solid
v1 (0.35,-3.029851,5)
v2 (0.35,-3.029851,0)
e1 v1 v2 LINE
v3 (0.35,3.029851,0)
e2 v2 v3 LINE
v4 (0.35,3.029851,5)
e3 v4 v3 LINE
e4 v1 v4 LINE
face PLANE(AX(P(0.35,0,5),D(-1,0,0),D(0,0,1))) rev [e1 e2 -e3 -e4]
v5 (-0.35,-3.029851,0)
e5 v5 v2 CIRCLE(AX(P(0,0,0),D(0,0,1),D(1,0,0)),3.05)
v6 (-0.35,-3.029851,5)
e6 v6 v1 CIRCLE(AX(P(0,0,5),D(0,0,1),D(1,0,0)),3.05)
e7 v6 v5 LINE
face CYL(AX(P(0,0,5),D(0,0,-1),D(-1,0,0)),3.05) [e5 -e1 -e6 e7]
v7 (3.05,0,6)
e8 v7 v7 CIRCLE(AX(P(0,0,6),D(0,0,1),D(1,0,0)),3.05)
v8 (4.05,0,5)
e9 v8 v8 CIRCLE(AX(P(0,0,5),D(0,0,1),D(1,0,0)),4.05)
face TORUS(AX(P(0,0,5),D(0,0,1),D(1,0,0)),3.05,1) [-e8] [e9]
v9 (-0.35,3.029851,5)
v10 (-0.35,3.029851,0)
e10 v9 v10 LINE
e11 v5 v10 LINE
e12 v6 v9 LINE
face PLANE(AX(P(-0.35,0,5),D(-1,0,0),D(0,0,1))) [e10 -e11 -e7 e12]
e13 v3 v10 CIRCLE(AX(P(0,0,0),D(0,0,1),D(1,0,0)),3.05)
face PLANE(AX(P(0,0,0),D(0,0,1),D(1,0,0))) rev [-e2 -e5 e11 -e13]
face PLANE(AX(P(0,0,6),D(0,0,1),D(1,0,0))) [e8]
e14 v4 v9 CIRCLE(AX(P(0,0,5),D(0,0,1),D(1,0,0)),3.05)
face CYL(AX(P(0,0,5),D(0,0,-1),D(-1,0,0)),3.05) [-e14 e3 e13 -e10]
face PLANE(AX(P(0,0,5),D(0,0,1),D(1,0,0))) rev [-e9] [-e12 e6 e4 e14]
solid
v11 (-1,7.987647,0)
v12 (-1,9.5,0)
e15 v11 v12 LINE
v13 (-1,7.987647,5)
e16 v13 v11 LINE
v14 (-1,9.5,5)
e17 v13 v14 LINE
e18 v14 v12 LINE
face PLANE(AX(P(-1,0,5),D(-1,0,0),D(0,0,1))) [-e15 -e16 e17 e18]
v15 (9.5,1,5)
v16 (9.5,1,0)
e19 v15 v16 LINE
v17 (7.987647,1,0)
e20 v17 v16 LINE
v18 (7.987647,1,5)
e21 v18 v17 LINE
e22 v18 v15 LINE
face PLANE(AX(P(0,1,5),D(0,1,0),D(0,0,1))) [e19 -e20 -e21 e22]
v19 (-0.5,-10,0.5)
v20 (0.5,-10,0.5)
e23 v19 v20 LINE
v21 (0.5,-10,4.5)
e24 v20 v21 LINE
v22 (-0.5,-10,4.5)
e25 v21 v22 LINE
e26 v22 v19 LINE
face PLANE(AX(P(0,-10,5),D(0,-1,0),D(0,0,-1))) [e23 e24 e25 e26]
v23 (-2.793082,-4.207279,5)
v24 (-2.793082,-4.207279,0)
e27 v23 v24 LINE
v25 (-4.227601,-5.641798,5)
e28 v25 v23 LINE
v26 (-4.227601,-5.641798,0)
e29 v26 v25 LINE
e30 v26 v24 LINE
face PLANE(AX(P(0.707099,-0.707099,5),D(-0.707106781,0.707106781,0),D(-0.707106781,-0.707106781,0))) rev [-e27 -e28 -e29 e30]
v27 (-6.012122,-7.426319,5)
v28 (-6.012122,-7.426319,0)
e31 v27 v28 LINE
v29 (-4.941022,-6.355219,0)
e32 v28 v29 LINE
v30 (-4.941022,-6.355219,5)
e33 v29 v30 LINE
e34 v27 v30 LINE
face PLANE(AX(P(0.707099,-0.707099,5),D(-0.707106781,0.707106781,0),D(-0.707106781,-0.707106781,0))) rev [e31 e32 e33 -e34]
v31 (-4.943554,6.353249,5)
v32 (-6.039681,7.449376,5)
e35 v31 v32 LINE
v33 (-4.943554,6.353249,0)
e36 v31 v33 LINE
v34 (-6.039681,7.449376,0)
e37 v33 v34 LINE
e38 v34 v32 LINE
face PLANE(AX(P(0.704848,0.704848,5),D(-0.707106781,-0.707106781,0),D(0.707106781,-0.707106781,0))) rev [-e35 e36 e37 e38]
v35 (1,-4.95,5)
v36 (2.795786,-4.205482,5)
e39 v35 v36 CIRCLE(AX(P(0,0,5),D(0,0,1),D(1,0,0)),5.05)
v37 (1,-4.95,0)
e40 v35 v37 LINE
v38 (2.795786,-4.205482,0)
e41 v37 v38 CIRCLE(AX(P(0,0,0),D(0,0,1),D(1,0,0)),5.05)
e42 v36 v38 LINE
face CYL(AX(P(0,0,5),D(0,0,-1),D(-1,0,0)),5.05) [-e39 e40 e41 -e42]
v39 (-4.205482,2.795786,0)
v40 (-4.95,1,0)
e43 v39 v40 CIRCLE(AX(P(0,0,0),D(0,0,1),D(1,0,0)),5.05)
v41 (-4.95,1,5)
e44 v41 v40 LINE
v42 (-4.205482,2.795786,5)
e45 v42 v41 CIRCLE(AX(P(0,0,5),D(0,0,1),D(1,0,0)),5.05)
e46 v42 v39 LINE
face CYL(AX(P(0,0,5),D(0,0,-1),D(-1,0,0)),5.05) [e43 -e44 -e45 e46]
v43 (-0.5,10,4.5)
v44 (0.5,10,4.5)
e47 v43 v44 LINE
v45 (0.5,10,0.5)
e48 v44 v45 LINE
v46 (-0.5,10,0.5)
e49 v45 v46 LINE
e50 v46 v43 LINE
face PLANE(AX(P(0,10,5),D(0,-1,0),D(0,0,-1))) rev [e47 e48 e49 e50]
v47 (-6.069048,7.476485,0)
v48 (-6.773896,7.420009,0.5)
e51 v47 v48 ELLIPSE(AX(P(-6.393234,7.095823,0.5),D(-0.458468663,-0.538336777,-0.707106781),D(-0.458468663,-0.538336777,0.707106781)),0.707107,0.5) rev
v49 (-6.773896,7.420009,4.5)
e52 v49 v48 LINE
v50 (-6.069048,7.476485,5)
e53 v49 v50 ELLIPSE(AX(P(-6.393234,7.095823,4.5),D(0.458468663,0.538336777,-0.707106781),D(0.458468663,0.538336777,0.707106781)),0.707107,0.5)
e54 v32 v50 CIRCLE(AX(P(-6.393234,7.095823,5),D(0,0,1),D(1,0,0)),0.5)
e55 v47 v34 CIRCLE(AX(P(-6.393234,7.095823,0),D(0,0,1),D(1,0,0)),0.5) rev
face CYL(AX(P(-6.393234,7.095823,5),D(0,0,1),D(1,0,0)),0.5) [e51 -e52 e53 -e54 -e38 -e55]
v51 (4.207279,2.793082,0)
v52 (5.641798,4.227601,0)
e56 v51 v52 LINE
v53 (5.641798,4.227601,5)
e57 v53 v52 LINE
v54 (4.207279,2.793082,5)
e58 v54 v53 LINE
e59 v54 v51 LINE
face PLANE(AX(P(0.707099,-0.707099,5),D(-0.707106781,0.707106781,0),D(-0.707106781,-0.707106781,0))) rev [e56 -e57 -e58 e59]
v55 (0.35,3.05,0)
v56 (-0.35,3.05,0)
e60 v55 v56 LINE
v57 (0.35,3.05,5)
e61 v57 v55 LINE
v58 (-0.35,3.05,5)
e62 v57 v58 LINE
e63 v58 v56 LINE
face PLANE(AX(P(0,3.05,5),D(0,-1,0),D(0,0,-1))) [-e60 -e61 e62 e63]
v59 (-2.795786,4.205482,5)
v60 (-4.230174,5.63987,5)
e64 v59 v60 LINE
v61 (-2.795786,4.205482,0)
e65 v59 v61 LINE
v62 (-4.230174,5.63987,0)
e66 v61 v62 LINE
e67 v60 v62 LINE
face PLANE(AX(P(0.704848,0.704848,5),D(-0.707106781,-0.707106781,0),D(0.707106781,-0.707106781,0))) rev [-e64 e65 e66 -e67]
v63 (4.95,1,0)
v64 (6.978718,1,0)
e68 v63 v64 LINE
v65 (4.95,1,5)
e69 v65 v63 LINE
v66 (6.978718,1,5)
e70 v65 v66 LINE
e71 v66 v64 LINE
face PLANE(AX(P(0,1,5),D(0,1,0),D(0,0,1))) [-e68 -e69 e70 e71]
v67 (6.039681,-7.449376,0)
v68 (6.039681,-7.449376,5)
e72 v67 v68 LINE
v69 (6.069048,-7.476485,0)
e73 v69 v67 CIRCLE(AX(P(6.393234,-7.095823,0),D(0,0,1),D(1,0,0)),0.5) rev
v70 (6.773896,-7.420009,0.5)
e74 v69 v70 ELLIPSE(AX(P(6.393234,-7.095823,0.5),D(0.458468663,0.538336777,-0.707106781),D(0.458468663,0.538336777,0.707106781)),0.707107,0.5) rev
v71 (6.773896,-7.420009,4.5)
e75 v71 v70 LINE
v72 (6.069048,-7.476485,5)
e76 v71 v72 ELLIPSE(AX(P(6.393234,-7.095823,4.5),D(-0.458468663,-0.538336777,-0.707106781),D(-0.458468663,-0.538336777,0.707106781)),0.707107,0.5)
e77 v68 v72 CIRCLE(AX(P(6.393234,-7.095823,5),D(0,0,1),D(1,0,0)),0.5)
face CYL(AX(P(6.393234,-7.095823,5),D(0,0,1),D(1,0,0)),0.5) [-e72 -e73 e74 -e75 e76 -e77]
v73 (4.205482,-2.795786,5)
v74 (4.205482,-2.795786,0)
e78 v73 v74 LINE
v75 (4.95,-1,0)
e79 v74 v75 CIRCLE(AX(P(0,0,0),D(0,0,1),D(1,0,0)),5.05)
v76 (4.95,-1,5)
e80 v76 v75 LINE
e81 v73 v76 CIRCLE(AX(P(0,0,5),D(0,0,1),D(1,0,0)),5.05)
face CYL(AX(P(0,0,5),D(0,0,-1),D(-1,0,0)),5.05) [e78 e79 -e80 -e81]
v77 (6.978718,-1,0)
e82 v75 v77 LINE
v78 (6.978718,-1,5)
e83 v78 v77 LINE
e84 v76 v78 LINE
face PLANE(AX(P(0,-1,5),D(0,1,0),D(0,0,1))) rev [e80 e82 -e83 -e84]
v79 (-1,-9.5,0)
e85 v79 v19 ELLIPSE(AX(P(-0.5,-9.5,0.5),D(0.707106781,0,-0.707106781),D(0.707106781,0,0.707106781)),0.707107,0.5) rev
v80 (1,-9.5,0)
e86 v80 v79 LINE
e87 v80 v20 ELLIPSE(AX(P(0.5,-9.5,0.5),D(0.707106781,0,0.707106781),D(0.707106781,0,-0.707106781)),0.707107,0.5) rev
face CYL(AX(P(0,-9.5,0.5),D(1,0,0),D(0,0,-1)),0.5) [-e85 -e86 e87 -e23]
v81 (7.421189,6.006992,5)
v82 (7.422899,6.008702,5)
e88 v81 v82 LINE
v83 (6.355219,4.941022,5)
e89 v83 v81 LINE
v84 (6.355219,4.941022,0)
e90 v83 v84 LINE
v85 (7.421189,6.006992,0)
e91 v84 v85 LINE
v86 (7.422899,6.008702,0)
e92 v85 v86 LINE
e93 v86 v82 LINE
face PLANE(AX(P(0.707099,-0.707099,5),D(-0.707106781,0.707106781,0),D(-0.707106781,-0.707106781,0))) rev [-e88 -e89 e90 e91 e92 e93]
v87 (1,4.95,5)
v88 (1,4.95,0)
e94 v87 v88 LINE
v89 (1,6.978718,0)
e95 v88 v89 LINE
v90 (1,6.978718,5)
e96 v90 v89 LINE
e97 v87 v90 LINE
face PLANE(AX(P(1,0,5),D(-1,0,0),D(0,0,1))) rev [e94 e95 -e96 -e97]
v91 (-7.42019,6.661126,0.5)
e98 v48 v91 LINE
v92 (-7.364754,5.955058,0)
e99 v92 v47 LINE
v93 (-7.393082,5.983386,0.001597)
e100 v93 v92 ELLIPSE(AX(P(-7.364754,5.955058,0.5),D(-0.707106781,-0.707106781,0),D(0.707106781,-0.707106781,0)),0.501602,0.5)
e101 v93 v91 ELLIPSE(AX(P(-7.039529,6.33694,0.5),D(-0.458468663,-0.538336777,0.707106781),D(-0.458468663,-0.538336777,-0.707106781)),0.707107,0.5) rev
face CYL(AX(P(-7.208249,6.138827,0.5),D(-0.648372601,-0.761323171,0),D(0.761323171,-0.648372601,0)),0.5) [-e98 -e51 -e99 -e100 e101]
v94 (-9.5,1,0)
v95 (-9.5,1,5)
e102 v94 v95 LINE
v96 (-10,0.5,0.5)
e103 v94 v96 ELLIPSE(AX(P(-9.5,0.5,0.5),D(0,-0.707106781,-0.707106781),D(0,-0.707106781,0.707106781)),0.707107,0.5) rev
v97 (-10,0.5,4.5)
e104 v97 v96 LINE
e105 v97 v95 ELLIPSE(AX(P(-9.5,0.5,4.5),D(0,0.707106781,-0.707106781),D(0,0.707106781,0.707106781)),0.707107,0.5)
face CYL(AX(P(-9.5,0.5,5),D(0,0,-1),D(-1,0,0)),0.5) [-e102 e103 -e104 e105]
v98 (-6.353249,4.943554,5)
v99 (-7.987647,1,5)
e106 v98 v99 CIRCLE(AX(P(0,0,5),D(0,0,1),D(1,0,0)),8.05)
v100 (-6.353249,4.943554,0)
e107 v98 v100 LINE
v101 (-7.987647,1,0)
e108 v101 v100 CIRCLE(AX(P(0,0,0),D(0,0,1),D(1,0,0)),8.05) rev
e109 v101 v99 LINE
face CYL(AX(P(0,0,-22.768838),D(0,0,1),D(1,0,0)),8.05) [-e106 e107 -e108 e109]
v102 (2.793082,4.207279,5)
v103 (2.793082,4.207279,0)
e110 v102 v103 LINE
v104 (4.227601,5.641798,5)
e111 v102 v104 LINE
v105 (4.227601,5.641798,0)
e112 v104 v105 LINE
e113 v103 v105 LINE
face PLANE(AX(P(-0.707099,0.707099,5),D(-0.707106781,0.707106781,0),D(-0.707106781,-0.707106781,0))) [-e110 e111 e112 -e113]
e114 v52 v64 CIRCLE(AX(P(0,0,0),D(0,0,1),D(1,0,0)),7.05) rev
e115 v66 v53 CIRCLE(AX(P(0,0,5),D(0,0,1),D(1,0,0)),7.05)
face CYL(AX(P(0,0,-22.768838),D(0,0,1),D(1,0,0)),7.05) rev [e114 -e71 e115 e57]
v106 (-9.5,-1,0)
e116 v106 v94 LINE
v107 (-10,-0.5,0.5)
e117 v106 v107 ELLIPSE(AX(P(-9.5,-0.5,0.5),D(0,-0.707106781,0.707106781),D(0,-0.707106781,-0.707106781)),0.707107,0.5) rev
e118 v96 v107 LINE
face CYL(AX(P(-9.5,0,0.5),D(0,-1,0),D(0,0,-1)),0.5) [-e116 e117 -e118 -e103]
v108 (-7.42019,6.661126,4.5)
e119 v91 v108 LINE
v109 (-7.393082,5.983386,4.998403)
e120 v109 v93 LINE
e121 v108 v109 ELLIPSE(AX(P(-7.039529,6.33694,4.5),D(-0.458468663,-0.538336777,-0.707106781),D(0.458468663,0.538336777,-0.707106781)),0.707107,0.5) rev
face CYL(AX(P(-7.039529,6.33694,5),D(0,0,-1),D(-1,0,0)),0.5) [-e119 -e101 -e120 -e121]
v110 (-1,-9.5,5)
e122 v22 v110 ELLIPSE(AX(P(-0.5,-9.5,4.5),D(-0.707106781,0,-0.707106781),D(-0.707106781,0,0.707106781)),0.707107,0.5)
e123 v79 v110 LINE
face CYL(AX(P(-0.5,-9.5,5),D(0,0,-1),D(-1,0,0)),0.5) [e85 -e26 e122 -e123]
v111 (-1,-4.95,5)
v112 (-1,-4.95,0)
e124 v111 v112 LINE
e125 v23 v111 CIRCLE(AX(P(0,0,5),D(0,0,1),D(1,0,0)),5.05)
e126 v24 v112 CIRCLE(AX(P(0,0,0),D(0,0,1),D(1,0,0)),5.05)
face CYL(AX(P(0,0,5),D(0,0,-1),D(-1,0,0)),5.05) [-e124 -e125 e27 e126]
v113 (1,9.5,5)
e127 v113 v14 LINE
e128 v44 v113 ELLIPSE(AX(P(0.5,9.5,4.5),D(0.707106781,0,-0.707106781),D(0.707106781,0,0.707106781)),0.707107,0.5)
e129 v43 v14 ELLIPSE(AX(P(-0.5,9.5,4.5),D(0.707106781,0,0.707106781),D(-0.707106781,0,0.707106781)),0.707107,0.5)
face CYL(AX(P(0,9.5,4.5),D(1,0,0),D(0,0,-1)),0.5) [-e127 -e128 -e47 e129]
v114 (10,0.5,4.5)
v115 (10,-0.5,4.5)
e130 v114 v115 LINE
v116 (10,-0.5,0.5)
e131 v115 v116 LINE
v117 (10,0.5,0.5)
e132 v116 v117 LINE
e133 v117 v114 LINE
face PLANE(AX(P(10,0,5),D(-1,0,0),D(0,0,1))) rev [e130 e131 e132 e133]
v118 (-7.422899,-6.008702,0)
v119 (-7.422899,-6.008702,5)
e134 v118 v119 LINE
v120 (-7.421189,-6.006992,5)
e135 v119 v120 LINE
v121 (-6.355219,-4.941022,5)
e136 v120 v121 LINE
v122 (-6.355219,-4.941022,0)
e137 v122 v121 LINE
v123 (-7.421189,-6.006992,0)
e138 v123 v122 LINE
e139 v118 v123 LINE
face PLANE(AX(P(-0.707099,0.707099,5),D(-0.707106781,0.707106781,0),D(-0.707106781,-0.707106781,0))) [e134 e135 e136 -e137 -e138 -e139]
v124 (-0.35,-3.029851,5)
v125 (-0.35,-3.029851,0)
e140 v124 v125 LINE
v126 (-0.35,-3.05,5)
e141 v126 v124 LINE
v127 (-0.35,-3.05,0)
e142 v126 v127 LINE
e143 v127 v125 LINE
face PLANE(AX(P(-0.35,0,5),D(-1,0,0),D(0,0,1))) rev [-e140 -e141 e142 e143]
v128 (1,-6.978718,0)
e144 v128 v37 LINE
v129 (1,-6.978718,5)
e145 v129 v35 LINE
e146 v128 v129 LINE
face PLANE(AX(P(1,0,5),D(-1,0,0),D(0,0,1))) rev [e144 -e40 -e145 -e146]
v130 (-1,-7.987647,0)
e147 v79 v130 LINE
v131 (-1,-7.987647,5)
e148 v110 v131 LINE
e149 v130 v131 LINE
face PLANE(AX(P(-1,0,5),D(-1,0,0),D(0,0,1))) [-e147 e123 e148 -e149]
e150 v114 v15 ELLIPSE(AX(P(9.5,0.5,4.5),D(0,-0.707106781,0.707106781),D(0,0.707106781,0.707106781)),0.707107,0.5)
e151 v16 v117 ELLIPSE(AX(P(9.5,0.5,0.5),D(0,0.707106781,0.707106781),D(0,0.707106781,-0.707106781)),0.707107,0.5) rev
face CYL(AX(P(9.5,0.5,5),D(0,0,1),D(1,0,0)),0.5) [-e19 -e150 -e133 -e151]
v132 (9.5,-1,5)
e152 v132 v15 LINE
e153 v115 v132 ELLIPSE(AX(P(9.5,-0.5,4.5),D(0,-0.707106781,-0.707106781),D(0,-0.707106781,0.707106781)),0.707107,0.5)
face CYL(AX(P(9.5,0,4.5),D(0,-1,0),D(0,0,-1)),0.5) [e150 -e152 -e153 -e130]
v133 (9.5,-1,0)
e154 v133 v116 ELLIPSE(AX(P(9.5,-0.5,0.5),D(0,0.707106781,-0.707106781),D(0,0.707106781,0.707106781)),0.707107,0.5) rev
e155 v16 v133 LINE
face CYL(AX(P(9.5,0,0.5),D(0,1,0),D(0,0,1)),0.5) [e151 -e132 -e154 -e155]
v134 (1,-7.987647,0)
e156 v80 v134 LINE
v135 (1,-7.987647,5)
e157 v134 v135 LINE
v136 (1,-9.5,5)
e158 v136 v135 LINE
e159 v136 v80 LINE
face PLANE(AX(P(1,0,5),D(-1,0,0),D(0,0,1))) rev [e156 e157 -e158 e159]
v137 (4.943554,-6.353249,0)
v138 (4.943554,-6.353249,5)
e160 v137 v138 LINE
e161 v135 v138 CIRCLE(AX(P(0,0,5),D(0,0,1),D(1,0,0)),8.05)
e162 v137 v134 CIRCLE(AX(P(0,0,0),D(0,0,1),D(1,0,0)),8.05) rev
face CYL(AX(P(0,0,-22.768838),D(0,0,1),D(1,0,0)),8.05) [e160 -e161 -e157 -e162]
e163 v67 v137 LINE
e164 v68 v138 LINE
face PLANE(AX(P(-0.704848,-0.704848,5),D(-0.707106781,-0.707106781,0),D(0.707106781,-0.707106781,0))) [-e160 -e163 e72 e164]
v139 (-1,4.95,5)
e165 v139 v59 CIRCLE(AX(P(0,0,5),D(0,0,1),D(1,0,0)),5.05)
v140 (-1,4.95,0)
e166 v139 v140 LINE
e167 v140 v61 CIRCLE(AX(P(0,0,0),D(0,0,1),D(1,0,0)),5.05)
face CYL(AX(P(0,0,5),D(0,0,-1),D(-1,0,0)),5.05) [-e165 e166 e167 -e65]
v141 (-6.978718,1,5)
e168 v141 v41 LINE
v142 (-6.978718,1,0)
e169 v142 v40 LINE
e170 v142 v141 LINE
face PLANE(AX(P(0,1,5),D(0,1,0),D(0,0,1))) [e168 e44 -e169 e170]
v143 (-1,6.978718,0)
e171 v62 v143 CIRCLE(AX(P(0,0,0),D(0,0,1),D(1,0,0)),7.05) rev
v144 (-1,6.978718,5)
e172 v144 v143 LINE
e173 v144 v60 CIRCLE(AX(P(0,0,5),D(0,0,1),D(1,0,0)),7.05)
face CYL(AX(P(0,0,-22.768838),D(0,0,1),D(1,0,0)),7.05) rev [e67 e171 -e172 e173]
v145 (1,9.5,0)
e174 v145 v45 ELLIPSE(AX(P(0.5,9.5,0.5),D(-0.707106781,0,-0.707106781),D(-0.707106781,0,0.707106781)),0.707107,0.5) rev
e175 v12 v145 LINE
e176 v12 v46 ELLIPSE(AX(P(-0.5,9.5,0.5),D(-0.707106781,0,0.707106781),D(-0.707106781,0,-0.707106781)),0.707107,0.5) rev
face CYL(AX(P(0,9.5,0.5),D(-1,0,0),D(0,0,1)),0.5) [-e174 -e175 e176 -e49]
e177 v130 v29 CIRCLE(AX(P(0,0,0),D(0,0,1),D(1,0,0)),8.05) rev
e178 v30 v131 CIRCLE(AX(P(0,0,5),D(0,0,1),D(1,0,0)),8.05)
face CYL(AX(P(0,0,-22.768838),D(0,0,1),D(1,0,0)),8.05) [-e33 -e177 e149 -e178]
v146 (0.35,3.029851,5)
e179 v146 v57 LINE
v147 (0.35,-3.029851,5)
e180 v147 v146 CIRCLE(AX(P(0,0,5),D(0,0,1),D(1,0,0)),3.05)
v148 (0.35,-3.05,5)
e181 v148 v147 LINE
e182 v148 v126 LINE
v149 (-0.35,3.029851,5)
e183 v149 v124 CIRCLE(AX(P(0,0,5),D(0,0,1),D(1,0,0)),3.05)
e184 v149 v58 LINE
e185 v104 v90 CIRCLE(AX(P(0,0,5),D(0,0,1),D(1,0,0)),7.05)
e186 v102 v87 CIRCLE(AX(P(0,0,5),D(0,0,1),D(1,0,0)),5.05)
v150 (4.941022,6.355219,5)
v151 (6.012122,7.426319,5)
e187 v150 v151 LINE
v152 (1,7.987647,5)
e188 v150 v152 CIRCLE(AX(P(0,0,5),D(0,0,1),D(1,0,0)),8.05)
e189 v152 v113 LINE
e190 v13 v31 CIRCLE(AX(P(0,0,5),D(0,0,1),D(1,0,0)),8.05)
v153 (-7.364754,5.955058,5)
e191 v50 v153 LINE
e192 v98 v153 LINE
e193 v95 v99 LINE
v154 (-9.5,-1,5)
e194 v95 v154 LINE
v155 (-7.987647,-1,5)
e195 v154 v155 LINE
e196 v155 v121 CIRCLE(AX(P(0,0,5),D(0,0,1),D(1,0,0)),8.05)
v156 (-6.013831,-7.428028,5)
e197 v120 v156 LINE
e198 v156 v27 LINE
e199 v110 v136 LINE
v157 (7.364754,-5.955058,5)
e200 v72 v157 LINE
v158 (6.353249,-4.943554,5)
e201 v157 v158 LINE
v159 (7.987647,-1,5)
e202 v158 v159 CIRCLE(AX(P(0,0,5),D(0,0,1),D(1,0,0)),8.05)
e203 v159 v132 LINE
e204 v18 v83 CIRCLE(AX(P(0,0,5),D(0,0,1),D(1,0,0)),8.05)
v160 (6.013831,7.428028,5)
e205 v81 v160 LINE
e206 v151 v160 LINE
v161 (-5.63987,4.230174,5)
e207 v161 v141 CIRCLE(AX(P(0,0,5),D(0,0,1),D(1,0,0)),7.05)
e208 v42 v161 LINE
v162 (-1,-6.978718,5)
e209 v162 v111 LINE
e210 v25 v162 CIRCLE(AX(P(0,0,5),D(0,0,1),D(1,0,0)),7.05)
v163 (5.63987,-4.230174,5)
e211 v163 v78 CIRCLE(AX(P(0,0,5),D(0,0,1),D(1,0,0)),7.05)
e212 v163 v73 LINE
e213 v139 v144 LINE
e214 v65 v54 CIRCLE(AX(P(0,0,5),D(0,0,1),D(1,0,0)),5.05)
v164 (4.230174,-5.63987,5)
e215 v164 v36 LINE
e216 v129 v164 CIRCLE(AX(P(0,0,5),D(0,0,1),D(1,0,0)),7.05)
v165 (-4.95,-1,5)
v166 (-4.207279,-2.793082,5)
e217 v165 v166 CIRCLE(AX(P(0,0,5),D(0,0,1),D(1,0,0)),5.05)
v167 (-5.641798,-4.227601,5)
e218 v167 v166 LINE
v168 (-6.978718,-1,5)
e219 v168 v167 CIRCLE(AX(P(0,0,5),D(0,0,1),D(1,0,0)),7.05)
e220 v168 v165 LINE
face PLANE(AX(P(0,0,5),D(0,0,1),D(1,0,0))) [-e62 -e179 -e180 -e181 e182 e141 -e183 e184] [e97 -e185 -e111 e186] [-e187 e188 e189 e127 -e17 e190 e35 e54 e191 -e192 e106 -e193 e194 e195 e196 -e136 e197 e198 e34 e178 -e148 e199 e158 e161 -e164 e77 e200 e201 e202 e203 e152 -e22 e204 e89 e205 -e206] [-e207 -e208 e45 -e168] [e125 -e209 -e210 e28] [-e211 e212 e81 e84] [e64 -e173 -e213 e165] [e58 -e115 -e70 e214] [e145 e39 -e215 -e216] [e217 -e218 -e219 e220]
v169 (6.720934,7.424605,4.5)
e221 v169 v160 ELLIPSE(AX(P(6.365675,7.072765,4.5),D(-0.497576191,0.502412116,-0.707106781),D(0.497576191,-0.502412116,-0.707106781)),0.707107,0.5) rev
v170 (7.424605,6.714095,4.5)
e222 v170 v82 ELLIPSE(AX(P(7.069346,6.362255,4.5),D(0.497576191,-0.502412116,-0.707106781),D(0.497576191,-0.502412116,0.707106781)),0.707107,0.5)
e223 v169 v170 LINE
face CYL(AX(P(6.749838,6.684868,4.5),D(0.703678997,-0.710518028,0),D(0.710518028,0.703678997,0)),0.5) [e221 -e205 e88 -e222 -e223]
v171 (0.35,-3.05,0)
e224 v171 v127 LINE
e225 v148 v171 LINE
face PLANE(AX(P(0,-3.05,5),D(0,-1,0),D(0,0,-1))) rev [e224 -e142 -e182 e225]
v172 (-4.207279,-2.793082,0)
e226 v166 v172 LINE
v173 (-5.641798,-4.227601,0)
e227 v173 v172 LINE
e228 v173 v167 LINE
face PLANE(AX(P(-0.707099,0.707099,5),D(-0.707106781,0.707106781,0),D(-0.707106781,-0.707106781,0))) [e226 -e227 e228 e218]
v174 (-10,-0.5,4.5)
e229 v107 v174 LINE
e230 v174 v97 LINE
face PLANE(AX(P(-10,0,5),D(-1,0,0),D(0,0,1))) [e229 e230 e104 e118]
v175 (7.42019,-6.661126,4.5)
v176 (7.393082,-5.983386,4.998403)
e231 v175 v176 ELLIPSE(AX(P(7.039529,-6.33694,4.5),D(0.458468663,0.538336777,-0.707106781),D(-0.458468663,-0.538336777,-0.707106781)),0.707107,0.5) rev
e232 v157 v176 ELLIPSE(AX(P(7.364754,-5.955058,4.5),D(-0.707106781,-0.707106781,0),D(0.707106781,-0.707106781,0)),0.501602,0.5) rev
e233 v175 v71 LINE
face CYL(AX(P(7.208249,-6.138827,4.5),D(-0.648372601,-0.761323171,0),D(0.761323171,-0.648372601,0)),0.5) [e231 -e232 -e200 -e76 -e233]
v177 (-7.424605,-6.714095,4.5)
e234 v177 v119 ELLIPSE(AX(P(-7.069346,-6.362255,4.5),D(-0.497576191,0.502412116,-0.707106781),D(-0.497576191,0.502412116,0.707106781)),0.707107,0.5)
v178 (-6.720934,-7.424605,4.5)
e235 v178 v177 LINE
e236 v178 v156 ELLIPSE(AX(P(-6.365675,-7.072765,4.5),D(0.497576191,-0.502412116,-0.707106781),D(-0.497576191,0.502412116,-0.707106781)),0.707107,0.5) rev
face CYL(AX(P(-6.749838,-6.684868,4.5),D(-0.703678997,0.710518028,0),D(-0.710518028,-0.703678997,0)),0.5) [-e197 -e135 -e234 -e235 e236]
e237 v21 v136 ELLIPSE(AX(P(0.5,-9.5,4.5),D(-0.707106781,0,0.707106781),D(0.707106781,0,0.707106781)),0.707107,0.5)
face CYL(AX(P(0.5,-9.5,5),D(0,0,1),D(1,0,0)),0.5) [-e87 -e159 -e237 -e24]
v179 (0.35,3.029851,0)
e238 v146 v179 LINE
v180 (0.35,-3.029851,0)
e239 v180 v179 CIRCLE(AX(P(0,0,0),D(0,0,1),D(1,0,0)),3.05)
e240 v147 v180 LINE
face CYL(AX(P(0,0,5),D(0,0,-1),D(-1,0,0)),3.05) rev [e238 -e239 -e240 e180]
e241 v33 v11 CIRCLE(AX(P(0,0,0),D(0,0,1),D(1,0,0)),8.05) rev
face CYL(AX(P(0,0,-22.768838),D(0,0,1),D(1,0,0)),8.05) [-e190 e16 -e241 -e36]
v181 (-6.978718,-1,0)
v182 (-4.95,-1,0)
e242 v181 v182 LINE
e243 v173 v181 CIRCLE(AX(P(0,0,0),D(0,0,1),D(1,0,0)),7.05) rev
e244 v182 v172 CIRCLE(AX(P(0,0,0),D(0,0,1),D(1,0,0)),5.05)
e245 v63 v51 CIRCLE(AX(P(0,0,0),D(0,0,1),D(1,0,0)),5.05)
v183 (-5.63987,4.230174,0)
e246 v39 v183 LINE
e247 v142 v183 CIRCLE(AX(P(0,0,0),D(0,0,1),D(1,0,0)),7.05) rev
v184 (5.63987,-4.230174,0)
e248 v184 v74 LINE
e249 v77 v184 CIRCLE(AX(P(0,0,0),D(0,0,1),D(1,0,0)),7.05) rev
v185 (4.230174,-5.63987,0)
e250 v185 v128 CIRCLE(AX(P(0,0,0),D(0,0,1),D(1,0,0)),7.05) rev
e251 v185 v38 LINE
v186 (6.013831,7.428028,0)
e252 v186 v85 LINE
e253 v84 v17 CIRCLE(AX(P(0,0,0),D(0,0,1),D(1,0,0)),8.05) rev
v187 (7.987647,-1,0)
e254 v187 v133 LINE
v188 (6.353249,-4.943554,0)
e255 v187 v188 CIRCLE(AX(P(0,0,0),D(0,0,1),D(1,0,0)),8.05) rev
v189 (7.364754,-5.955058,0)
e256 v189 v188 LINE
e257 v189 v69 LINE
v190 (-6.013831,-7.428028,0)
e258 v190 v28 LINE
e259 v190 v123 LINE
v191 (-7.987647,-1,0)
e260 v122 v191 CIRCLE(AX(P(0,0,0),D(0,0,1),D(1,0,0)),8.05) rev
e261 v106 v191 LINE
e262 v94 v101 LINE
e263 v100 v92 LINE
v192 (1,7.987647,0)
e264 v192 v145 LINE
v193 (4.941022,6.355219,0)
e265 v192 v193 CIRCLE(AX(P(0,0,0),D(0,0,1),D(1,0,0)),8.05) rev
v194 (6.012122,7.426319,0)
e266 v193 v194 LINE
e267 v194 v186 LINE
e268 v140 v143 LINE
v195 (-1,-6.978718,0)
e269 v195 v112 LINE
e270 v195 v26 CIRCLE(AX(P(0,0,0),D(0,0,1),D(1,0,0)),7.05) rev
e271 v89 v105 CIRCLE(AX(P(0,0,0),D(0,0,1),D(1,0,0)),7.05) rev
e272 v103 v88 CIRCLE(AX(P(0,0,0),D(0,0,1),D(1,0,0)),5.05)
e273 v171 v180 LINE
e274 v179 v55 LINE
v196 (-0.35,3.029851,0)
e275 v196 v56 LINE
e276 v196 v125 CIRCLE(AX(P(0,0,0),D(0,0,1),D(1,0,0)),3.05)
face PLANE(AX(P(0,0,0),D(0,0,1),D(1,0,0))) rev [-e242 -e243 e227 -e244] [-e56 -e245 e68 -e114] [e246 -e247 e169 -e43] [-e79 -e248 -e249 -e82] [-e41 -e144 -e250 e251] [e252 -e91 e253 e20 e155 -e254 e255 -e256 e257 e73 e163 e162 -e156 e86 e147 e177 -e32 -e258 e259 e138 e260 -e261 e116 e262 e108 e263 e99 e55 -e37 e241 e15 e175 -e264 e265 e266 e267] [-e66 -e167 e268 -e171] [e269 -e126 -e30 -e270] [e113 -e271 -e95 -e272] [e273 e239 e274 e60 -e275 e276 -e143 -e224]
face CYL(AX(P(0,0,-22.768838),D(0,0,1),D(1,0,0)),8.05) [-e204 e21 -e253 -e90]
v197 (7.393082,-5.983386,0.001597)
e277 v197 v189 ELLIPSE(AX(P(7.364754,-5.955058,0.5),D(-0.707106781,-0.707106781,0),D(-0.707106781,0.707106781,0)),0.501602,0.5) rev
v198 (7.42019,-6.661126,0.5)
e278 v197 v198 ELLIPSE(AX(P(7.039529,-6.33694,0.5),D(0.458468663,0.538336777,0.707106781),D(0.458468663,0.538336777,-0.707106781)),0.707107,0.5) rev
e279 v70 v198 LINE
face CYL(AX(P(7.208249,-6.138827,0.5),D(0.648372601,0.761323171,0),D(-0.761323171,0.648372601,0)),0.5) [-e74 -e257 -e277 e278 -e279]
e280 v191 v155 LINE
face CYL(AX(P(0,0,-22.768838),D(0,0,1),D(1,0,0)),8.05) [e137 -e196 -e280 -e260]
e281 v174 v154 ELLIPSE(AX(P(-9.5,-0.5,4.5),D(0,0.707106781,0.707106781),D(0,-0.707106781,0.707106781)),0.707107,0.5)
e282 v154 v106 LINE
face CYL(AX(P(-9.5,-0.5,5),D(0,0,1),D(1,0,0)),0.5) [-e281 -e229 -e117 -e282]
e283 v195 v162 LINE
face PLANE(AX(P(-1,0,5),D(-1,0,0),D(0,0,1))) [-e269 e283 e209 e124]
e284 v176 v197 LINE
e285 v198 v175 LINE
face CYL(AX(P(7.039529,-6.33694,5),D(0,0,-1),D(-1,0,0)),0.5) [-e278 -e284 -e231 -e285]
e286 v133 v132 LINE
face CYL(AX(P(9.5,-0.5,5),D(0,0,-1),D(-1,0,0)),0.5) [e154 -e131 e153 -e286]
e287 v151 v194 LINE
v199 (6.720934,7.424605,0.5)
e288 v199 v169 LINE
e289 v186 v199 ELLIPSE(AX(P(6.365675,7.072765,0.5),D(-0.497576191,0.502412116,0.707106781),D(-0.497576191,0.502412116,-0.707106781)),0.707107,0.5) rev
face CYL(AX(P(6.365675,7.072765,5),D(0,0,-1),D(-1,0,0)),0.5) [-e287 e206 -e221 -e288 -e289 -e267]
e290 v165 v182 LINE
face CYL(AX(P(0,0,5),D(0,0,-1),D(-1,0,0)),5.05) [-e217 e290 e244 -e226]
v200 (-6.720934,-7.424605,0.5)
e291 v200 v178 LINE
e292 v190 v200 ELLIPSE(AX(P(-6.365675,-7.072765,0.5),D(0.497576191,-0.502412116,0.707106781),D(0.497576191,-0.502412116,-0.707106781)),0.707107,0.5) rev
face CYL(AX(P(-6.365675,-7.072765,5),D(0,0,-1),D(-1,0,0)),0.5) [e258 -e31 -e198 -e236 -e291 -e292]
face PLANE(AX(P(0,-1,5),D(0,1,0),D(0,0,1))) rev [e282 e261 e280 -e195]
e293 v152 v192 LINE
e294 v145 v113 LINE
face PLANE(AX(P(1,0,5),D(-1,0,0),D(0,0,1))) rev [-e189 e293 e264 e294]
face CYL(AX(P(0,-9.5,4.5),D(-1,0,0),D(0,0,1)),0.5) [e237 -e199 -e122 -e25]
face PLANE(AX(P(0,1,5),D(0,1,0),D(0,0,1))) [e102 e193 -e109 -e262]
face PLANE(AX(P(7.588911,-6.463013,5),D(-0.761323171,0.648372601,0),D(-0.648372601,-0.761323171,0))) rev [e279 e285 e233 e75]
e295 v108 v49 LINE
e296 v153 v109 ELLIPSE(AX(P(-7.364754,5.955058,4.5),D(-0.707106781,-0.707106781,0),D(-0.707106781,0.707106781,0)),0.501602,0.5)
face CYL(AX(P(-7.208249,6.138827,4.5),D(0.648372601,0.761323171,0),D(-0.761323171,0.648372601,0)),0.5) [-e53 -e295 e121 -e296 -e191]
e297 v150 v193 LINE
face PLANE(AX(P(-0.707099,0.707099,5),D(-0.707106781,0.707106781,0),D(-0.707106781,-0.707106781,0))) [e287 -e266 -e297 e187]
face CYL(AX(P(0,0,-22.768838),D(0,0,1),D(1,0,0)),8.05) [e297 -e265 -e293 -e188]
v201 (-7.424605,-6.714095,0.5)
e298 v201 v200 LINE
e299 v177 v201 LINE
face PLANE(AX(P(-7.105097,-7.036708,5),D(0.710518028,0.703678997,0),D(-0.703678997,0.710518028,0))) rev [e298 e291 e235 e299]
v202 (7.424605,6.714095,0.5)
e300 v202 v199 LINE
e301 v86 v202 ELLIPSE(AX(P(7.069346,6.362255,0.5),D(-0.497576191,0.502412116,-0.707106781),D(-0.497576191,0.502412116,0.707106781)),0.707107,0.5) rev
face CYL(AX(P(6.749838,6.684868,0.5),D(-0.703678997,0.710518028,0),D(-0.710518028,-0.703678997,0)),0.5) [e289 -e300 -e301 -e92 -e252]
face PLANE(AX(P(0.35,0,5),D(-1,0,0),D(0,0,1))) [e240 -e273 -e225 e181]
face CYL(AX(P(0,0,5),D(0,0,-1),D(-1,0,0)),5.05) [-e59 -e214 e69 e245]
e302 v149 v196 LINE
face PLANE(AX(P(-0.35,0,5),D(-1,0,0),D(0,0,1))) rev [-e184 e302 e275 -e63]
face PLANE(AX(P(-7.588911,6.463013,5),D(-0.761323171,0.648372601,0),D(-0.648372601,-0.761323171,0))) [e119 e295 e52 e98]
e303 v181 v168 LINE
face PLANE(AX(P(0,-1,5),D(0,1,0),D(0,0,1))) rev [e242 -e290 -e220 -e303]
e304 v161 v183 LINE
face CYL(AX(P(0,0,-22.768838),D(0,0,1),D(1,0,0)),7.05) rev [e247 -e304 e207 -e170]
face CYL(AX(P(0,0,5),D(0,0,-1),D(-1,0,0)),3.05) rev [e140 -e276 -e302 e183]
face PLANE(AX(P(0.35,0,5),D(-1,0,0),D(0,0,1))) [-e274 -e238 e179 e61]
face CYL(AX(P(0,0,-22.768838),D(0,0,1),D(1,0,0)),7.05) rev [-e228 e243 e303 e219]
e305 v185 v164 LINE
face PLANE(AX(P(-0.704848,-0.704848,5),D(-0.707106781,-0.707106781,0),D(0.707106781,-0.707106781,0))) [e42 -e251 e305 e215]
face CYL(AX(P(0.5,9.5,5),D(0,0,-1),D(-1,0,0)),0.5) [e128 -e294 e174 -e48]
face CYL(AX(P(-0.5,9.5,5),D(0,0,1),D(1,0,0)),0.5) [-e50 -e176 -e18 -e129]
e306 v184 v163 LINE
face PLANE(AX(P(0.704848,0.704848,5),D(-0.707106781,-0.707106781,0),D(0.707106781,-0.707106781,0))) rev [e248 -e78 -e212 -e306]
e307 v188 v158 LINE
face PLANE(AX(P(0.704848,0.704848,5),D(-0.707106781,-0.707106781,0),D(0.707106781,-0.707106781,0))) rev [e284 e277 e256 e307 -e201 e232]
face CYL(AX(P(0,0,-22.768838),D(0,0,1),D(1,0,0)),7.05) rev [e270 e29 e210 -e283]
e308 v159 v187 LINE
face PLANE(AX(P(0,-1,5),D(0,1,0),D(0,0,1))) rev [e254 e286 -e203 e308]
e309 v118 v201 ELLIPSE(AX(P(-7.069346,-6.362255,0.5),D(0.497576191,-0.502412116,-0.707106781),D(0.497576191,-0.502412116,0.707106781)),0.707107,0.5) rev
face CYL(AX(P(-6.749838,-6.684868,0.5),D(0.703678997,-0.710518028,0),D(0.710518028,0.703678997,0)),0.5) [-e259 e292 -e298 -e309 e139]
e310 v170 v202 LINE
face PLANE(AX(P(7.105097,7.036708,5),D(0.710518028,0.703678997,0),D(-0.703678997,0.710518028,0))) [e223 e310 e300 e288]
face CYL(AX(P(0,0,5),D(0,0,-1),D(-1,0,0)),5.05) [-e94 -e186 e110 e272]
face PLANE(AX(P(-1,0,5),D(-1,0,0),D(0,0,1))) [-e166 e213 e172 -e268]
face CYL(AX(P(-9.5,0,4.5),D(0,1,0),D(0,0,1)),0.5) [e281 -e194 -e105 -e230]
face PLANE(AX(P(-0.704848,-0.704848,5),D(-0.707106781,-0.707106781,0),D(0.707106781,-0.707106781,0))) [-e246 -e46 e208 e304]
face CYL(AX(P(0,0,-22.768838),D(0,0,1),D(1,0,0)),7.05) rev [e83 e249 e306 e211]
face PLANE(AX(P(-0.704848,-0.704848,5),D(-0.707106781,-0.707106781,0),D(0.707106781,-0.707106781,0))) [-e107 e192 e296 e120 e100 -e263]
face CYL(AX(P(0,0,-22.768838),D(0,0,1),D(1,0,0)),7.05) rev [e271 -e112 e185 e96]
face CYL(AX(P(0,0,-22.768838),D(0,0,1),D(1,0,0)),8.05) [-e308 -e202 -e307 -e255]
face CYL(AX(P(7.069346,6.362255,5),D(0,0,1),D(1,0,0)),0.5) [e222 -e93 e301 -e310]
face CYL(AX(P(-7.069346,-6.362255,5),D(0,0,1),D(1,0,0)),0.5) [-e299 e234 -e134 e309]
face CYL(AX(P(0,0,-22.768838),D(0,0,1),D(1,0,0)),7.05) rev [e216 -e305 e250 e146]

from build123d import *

# Parameters (mm, degrees)
BOSS_EXTRUDE1_DEPTH   = 5
BOSS_EXTRUDE1_2_DEPTH = 5
FILLET1_R             = 0.5
SKETCH2_R             = 8.05
SKETCH2_R_2           = 7.05
BOSS_EXTRUDE2_DEPTH   = 5
SKETCH6_R             = 4.05
BOSS_EXTRUDE8_DEPTH   = 1
FILLET2_R             = 1


with BuildPart() as part:
    # Sketch1 → Boss-Extrude1 (new body)
    with BuildSketch(Plane.XY):
        with BuildLine():
            Line((-1, -10), (1, -10))
            Line((1, -10), (1, -4.95))
            ThreePointArc((1, -4.95), (1.934056641, -4.664967836), (2.795786265, -4.205482037))
            Line((2.795786265, -4.205482037), (6.422695211, -7.832390982))
            Line((6.422695211, -7.832390982), (7.719440413, -6.309744641))
            Line((7.719440413, -6.309744641), (4.205482037, -2.795786265))
            ThreePointArc((4.205482037, -2.795786265), (4.664967836, -1.934056641), (4.95, -1))
            Line((4.95, -1), (10, -1))
            Line((10, -1), (10, 1))
            Line((10, 1), (4.95, 1))
            ThreePointArc((4.95, 1), (4.665589357, 1.932556844), (4.20727875, 2.793081724))
            Line((4.20727875, 2.793081724), (7.774746809, 6.360549784))
            Line((7.774746809, 6.360549784), (6.367388814, 7.78158584))
            Line((6.367388814, 7.78158584), (2.793081724, 4.20727875))
            ThreePointArc((2.793081724, 4.20727875), (1.932556844, 4.665589357), (1, 4.95))
            Line((1, 4.95), (1, 10))
            Line((1, 10), (-1, 10))
            Line((-1, 10), (-1, 4.95))
            ThreePointArc((-1, 4.95), (-1.934056641, 4.664967836), (-2.795786265, 4.205482037))
            Line((-2.795786265, 4.205482037), (-6.422695211, 7.832390982))
            Line((-6.422695211, 7.832390982), (-7.719440413, 6.309744641))
            Line((-7.719440413, 6.309744641), (-4.205482037, 2.795786265))
            ThreePointArc((-4.205482037, 2.795786265), (-4.664967836, 1.934056641), (-4.95, 1))
            Line((-4.95, 1), (-10, 1))
            Line((-10, 1), (-10, -1))
            Line((-10, -1), (-4.95, -1))
            ThreePointArc((-4.95, -1), (-4.665589357, -1.932556844), (-4.20727875, -2.793081724))
            Line((-4.20727875, -2.793081724), (-7.774746809, -6.360549784))
            Line((-7.774746809, -6.360549784), (-6.367388814, -7.78158584))
            Line((-6.367388814, -7.78158584), (-2.793081724, -4.20727875))
            ThreePointArc((-2.793081724, -4.20727875), (-1.932556844, -4.665589357), (-1, -4.95))
            Line((-1, -4.95), (-1, -10))
        make_face()
        with BuildLine():
            Line((0.35, -3.029851482), (0.35, -3.05))
            Line((0.35, -3.05), (0, -3.05))
            Line((0, -3.05), (-0.35, -3.05))
            Line((-0.35, -3.05), (-0.35, -3.029851482))
            ThreePointArc((-0.35, -3.029851482), (-3.05, 0), (-0.35, 3.029851482))
            Line((-0.35, 3.029851482), (-0.35, 3.05))
            Line((-0.35, 3.05), (0, 3.05))
            Line((0, 3.05), (0.35, 3.05))
            Line((0.35, 3.05), (0.35, 3.029851482))
            ThreePointArc((0.35, 3.029851482), (3.05, 0), (0.35, -3.029851482))
        make_face(mode=Mode.SUBTRACT)
    extrude(amount=BOSS_EXTRUDE1_DEPTH)

    # Fillet1
    fillet1_edges = [part.edges().sort_by_distance(p)[0] for p in [
        (-7.071067812, 7.071067812, 5),
        (-10, 0, 5),
        (-7.071067812, -7.071067812, 5),
        (0, -10, 5),
        (7.071067812, -7.071067812, 5),
        (10, 0, 5),
        (10, 0, 0),
        (7.071067812, -7.071067812, 0),
        (0, -10, 0),
        (-7.071067812, -7.071067812, 0),
        (-10, 0, 0),
        (-7.071067812, 7.071067812, 0),
        (0, 10, 0),
        (7.071067812, 7.071067812, 0),
        (7.071067812, 7.071067812, 5),
        (10, 1, 2.5),
        (10, -1, 2.5),
        (7.719440413, -6.309744641, 2.5),
        (6.422695211, -7.832390982, 2.5),
        (1, -10, 2.5),
        (-1, -10, 2.5),
        (-6.367388814, -7.78158584, 2.5),
        (-7.774746809, -6.360549784, 2.5),
        (-10, -1, 2.5),
        (-10, 1, 2.5),
        (-7.719440413, 6.309744641, 2.5),
        (-6.422695211, 7.832390982, 2.5),
        (-1, 10, 2.5),
        (1, 10, 2.5),
        (6.367388814, 7.78158584, 2.5),
        (7.774746809, 6.360549784, 2.5),
        (0, 10, 5),
    ]]
    fillet(fillet1_edges, radius=FILLET1_R)

    # Sketch2 → Boss-Extrude2 (add)
    with BuildSketch(Plane.XY.offset(5)):
        Circle(SKETCH2_R)
        Circle(SKETCH2_R_2, mode=Mode.SUBTRACT)
    extrude(amount=-BOSS_EXTRUDE2_DEPTH)


with BuildPart() as body_2:
    # Sketch1 → Boss-Extrude1 2 (new body)
    with BuildSketch(Plane.XY):
        with BuildLine():
            ThreePointArc((0, -3.05), (0.175289734, -3.044958704), (0.35, -3.029851482))
            Line((0.35, -3.029851482), (0.35, 3.029851482))
            ThreePointArc((0.35, 3.029851482), (0.175289734, 3.044958704), (0, 3.05))
            ThreePointArc((0, 3.05), (-0.175289734, 3.044958704), (-0.35, 3.029851482))
            Line((-0.35, 3.029851482), (-0.35, -3.029851482))
            ThreePointArc((-0.35, -3.029851482), (-0.175289734, -3.044958704), (0, -3.05))
        make_face()
    extrude(amount=BOSS_EXTRUDE1_2_DEPTH)

    # Sketch6 → Boss-Extrude8 (add)
    with BuildSketch(Plane.XY.offset(5)):
        Circle(SKETCH6_R)
    extrude(amount=BOSS_EXTRUDE8_DEPTH)

    # Fillet2
    fillet2_edges = [body_2.edges().sort_by_distance(p)[0] for p in [
        (-4.05, 0, 6),
    ]]
    fillet(fillet2_edges, radius=FILLET2_R - 0.0001)  # a hair under: the kernel refuses the full size


solid = Compound([part.part, body_2.part])
